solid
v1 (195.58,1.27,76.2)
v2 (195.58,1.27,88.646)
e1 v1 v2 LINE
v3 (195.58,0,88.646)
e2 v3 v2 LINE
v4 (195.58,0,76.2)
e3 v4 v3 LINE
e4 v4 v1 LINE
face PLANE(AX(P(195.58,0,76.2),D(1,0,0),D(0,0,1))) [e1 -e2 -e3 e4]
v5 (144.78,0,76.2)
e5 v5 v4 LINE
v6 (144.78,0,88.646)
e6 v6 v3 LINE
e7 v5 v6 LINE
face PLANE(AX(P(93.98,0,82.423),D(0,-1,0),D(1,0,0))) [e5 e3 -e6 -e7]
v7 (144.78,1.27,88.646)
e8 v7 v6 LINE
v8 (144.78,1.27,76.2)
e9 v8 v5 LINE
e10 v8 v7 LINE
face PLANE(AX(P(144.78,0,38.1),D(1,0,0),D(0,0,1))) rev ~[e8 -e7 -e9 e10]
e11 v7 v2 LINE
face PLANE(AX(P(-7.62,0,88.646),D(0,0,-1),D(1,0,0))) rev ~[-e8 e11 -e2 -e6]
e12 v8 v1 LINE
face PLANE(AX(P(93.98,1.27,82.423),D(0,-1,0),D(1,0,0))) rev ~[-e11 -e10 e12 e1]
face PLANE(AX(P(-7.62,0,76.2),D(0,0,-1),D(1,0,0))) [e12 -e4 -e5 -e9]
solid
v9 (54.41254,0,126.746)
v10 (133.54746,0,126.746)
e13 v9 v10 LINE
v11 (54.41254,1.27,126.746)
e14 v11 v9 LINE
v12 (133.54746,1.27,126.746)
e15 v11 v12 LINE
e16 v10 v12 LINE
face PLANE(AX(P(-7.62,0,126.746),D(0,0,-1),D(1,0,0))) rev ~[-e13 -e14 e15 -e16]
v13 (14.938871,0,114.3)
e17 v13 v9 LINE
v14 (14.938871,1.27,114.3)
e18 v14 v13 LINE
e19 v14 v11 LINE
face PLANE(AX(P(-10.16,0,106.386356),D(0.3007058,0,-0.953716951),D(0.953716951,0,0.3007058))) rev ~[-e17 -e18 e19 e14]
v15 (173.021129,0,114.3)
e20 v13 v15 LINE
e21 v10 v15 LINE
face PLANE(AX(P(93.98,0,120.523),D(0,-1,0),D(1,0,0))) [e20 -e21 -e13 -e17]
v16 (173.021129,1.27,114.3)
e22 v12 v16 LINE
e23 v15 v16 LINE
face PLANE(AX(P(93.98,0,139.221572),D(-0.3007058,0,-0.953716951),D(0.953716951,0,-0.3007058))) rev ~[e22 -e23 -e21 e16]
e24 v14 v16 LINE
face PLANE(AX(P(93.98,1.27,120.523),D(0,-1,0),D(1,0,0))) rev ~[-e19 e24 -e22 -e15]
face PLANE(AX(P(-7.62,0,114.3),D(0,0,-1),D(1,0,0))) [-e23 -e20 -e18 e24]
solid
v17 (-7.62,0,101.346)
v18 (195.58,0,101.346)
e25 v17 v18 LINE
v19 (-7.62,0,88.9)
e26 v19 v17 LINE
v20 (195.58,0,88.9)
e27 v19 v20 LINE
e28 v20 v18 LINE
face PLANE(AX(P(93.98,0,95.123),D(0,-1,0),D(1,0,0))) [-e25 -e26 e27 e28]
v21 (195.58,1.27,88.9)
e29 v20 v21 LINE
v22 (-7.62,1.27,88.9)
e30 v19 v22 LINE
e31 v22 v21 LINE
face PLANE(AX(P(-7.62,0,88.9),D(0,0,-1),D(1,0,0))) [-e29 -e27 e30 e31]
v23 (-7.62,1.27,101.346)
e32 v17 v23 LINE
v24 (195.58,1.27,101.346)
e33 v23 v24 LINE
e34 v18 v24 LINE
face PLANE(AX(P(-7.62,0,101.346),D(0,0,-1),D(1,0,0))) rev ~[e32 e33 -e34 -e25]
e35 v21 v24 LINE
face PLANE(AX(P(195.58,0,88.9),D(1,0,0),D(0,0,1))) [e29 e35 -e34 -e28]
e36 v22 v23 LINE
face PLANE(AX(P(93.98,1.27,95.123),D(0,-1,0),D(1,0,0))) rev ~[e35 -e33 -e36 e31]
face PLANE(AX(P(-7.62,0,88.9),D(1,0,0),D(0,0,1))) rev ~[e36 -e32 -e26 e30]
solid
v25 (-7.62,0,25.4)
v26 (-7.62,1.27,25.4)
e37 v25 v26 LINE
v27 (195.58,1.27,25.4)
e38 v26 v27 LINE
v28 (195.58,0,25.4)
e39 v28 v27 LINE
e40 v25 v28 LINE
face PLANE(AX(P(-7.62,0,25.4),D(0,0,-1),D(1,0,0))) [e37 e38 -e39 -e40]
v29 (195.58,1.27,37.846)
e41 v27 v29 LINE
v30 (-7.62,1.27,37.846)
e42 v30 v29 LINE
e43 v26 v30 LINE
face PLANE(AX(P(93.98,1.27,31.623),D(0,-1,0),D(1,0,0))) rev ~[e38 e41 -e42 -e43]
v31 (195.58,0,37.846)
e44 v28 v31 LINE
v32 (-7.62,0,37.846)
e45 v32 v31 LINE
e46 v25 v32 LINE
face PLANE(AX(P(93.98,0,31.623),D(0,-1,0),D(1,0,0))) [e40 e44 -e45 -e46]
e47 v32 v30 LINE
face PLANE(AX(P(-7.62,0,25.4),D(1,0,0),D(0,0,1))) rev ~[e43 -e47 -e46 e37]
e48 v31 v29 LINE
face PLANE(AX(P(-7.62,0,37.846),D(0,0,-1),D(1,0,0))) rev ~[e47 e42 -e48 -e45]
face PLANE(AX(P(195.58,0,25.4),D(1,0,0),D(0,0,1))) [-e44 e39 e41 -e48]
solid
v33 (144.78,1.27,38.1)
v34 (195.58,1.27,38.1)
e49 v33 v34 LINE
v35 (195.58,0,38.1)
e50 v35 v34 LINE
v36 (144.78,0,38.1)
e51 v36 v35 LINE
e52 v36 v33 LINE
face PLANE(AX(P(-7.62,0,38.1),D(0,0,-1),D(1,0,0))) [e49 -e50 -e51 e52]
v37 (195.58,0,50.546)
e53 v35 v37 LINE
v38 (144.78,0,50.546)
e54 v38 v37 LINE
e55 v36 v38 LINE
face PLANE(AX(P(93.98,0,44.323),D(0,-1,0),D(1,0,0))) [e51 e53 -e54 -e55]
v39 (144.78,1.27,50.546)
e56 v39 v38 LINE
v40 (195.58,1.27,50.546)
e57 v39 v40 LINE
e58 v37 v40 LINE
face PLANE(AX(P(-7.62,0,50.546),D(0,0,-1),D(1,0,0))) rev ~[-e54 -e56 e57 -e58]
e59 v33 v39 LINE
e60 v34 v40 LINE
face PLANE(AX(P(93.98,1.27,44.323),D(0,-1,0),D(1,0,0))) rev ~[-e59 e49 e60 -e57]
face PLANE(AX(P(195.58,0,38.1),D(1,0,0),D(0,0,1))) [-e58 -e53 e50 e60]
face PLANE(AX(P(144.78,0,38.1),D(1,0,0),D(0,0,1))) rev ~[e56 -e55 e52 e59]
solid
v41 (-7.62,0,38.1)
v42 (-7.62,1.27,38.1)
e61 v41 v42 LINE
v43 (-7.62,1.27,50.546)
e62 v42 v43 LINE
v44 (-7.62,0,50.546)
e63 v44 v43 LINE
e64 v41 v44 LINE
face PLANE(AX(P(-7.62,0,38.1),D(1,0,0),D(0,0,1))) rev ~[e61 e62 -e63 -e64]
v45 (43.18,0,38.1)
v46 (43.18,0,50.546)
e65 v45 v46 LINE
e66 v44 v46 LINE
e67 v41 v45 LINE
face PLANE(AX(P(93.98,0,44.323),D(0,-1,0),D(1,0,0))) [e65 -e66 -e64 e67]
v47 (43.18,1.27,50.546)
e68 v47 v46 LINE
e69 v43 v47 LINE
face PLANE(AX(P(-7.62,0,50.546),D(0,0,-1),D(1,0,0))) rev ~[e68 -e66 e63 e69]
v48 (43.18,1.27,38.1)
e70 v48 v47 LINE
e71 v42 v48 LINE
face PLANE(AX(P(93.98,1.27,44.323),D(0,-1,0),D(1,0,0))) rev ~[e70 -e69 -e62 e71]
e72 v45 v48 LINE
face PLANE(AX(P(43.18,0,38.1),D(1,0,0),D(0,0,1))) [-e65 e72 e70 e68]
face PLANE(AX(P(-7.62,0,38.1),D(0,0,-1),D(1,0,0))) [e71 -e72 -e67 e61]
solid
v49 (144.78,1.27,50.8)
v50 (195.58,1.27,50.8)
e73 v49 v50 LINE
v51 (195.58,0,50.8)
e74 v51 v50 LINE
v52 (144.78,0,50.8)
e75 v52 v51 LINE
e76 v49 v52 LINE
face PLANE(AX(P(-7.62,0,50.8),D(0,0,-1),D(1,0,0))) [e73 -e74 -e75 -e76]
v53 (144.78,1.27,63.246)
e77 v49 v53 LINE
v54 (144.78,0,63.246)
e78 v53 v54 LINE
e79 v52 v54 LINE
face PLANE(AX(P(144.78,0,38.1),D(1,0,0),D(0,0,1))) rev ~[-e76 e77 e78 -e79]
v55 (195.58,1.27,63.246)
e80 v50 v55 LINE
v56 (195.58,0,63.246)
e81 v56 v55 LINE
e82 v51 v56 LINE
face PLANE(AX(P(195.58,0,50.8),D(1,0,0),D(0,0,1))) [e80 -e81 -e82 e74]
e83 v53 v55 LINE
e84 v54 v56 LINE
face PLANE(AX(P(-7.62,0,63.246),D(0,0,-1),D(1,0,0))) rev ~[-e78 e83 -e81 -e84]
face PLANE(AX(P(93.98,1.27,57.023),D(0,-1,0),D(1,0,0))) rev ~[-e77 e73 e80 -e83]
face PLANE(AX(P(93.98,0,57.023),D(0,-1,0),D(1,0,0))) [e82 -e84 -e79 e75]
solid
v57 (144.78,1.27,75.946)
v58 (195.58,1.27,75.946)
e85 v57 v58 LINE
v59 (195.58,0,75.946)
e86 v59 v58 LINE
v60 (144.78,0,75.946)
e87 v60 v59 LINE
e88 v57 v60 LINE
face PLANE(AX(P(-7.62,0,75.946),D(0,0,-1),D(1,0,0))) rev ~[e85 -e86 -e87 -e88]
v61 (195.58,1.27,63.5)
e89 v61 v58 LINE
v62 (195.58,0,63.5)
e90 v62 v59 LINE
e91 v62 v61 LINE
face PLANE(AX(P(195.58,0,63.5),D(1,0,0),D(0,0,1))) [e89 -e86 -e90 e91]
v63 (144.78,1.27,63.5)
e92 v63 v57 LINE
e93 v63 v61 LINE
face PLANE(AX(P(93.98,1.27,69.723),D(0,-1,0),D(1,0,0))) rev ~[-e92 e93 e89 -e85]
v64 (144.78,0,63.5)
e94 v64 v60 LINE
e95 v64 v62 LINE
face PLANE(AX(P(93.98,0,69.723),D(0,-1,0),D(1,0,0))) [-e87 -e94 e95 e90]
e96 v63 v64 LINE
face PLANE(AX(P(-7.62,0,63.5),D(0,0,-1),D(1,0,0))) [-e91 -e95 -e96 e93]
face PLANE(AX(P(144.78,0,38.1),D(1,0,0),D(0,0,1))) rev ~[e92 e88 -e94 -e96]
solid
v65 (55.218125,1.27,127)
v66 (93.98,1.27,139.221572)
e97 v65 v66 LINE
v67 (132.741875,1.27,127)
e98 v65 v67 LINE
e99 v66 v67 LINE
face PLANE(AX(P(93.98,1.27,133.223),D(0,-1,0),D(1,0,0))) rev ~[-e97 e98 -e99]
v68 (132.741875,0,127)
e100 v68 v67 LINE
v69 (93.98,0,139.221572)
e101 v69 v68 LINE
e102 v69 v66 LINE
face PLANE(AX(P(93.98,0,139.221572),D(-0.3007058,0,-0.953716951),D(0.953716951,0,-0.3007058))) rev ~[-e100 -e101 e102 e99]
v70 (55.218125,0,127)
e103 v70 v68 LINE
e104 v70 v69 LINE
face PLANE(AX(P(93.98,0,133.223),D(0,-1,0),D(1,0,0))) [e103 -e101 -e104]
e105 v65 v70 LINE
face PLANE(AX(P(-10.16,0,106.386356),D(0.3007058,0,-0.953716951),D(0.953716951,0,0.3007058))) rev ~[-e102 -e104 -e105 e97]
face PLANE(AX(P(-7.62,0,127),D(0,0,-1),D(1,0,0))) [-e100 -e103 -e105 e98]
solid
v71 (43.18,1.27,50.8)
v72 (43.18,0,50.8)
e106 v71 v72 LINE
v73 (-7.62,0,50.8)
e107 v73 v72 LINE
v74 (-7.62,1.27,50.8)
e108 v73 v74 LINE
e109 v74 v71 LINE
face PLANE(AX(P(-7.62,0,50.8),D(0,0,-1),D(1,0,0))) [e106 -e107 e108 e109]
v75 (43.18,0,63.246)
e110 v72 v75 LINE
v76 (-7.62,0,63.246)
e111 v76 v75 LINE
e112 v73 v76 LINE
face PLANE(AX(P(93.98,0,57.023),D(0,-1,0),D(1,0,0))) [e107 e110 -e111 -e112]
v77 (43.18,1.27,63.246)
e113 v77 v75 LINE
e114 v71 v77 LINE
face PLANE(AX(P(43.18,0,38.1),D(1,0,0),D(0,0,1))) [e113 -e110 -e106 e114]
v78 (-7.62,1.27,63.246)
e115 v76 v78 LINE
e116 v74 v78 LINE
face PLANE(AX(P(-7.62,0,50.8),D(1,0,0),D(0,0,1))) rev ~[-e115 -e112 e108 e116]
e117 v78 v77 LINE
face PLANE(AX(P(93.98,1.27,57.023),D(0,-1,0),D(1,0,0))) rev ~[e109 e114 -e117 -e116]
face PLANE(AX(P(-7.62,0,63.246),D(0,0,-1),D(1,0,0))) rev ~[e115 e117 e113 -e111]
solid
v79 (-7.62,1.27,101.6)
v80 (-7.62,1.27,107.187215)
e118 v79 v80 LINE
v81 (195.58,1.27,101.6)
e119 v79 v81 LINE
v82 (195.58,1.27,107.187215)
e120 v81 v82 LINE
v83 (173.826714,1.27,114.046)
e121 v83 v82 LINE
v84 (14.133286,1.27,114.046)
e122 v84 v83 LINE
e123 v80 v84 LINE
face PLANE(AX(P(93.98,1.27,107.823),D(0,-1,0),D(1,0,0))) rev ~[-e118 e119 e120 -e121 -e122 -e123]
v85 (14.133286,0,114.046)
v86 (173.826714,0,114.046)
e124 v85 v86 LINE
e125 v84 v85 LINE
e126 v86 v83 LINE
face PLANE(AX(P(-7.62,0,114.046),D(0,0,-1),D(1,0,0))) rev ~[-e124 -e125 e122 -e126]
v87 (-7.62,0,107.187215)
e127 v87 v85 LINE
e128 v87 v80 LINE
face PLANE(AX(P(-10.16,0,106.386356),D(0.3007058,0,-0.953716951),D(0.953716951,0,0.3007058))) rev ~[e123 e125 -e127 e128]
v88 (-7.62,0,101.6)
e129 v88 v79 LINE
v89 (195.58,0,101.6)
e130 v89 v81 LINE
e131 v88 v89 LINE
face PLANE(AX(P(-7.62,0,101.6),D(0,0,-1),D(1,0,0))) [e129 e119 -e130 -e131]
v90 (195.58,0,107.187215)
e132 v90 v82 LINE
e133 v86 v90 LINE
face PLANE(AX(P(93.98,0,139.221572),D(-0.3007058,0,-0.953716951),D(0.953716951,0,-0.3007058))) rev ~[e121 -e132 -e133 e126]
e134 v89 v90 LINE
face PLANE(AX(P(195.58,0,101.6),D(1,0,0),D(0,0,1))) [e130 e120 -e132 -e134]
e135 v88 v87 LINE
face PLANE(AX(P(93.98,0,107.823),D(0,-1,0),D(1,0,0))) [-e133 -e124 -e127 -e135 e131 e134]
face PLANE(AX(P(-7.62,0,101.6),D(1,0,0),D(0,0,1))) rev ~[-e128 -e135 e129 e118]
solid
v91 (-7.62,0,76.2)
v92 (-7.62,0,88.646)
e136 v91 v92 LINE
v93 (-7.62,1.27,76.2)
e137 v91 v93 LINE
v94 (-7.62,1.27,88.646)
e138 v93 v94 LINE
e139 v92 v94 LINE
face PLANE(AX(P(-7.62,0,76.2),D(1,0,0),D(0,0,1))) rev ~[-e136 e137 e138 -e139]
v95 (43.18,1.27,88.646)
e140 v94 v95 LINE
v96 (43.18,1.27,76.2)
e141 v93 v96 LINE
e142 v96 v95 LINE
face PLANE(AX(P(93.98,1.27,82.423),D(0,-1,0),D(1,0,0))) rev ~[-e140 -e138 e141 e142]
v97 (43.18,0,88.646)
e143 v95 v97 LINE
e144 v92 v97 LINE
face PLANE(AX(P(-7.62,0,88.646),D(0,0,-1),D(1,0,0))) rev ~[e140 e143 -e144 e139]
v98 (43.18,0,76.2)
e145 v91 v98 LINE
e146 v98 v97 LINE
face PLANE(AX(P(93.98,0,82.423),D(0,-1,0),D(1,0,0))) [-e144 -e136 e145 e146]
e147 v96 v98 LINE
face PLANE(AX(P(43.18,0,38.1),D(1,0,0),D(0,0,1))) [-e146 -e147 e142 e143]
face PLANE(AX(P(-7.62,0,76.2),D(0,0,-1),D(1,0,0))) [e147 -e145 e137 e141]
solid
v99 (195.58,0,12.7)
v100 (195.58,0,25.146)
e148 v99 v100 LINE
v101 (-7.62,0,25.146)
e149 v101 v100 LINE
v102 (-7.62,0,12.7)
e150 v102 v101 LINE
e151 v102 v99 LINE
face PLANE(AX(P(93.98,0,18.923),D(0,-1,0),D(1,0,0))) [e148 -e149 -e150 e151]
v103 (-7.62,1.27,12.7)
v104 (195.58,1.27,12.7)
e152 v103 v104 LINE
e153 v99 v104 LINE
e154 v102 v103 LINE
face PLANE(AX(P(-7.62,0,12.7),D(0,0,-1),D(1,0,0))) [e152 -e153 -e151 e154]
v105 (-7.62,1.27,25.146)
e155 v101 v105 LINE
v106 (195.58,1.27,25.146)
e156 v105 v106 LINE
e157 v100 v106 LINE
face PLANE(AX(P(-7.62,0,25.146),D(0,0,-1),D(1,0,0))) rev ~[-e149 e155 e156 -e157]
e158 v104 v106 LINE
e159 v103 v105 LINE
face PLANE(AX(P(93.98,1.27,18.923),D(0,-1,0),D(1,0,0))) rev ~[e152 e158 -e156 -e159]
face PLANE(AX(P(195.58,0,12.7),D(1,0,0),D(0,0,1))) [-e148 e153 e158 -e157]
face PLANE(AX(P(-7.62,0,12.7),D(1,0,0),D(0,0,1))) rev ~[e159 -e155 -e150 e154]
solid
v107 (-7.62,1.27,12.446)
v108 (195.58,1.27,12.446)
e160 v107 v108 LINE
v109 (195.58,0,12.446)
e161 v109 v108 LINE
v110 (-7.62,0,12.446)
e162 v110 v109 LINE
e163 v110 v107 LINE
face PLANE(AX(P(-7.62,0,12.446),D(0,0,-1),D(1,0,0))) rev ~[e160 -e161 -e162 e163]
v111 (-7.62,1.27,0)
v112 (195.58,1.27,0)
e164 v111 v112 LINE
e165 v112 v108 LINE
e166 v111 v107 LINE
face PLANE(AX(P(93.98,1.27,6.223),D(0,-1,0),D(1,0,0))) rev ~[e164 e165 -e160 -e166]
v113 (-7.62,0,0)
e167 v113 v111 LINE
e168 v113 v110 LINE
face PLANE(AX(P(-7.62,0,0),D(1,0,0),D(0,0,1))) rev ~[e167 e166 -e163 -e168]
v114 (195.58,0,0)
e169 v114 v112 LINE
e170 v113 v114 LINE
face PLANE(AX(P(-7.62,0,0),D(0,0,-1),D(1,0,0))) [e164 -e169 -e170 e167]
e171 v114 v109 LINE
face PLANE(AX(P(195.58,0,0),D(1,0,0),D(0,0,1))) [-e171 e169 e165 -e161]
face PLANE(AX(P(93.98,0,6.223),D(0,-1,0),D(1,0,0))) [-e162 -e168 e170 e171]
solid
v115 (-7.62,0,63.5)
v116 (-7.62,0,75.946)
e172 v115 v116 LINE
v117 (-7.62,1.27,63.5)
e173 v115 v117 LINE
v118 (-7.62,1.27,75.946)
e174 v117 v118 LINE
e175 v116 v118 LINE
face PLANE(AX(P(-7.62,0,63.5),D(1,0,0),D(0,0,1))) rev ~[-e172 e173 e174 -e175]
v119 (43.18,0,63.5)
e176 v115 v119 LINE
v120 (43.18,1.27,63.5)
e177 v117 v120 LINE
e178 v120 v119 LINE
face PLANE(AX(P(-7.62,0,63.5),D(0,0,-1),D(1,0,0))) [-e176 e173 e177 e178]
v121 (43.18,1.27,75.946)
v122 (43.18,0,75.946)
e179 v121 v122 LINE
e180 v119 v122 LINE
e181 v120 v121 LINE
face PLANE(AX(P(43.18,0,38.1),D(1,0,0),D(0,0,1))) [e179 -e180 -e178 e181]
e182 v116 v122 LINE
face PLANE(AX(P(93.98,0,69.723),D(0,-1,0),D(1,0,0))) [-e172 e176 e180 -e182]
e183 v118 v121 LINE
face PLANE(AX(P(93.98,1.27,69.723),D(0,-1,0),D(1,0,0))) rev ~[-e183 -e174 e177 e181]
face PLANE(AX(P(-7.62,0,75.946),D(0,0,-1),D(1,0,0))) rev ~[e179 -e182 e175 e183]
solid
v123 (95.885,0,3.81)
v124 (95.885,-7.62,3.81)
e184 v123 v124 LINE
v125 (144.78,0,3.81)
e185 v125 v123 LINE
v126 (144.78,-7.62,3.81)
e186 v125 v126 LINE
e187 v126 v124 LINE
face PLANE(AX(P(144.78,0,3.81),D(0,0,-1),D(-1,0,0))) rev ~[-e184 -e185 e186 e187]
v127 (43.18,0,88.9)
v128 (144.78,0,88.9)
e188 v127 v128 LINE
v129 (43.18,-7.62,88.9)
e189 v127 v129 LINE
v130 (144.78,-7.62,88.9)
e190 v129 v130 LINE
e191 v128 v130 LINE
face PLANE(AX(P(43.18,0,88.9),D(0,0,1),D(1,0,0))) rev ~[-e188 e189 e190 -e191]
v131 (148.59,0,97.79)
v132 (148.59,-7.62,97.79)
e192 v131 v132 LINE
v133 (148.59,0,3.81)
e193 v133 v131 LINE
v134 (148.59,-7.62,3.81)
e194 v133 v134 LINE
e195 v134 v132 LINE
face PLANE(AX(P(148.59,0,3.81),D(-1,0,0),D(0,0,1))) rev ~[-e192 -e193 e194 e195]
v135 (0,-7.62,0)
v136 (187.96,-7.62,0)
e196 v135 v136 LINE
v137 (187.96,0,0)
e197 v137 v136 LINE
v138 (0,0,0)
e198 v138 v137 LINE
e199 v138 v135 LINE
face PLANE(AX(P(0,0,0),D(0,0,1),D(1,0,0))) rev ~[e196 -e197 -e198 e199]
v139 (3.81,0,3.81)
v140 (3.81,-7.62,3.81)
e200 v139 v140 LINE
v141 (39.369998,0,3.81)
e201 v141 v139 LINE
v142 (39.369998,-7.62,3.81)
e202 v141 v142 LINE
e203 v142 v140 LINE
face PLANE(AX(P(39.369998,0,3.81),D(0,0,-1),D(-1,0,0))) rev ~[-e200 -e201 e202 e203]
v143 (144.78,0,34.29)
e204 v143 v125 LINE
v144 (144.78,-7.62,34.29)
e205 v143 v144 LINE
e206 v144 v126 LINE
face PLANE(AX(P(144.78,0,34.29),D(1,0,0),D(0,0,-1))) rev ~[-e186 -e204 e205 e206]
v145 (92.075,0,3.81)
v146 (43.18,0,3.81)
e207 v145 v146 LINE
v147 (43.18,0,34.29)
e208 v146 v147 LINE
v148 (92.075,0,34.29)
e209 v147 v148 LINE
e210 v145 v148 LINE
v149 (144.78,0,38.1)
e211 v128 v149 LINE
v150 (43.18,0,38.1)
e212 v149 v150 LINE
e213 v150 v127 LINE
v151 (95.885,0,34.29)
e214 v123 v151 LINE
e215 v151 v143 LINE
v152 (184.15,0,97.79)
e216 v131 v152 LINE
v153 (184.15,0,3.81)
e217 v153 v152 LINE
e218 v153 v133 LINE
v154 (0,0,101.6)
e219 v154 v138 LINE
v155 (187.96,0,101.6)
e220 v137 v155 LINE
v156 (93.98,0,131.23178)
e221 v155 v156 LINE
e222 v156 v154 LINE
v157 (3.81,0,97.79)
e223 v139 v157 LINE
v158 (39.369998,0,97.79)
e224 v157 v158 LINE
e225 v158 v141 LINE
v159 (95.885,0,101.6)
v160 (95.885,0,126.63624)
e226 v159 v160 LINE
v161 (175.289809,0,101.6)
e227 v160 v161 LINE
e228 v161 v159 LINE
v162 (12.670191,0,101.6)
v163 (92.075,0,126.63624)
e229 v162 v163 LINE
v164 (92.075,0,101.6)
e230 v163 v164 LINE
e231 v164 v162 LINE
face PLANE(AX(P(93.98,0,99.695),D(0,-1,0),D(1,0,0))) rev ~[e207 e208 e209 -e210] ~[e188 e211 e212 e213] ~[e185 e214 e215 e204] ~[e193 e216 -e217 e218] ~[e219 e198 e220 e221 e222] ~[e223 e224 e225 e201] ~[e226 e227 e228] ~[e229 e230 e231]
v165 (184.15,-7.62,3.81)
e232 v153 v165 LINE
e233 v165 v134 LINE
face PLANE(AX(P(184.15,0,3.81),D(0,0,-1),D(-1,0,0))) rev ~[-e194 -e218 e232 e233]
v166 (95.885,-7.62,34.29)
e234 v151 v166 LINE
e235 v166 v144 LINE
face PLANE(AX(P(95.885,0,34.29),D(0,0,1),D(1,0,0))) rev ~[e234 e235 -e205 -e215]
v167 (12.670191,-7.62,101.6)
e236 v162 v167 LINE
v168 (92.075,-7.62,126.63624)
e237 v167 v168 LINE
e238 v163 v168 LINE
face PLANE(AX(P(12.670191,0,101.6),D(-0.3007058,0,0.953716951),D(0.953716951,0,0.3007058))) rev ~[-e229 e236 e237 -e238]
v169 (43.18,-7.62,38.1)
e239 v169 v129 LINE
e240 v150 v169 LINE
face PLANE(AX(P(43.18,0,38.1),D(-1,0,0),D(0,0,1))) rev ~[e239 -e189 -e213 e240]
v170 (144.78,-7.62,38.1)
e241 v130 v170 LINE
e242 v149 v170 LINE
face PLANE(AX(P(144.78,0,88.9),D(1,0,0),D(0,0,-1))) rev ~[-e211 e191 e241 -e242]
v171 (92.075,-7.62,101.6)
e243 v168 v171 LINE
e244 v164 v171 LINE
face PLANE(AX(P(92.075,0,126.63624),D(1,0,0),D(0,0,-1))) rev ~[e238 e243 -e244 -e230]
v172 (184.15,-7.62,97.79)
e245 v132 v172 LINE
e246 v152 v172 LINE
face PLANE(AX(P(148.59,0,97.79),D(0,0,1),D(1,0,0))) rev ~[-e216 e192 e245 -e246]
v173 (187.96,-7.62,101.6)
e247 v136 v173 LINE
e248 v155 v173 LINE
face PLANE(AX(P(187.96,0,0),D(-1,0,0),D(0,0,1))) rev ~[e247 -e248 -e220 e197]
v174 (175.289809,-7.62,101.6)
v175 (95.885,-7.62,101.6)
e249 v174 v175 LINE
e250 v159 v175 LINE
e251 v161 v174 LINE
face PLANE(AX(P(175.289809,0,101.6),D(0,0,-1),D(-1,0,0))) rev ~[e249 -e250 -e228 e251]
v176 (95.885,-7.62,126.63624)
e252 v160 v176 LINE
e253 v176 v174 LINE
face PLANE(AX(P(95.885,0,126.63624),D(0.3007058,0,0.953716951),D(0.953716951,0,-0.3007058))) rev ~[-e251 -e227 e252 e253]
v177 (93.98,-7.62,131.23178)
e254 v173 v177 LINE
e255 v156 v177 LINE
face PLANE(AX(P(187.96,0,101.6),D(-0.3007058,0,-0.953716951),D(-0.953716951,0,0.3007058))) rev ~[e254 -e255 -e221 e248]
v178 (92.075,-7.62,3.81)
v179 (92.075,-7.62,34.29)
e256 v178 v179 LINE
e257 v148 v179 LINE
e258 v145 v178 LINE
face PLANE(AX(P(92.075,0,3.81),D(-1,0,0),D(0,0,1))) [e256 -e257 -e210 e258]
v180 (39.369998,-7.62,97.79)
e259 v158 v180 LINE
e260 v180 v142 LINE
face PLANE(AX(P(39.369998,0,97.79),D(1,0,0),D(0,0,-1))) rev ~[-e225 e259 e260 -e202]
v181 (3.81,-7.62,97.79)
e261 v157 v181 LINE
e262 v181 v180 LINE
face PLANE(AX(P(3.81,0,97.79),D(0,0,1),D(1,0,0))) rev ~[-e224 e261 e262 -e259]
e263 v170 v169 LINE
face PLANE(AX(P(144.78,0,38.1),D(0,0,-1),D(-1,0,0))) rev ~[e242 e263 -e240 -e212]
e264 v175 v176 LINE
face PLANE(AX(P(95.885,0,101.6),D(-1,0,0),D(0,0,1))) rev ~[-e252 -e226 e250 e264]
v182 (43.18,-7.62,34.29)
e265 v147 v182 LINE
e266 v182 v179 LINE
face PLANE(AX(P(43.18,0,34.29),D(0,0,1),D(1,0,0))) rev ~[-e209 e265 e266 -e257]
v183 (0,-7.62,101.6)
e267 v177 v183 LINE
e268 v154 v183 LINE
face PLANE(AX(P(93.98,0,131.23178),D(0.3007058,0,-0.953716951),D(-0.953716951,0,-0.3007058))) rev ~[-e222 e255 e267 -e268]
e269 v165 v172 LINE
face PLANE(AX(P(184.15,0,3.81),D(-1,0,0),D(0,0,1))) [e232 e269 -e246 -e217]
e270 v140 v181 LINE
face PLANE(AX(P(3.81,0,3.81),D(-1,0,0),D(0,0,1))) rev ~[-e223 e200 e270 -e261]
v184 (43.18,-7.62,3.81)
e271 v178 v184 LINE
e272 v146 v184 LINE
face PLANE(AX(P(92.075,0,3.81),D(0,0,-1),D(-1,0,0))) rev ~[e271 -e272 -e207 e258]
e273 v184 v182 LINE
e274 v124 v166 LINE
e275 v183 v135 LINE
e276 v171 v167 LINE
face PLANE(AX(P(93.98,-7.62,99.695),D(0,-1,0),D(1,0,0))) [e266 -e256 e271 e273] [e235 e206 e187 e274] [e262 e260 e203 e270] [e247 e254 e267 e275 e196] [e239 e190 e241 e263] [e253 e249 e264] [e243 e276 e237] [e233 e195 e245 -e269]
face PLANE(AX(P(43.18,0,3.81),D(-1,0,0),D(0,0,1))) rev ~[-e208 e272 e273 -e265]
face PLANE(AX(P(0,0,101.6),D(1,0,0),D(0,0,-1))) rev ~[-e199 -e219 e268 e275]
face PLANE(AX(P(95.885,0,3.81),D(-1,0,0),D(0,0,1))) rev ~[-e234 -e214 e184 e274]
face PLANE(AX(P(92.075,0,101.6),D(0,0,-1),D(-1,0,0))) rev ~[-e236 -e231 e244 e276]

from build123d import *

# Parameters (mm, degrees)
F0_W     = 3.81
F0_H     = 93.98
F0_W_2   = 101.6
F0_H_2   = 3.81
F0_H_3   = 30.48
F0_H_4   = 5.08
F1_DEPTH = 7.62
F2_W     = 203.2
F2_H     = 12.446
F3_DEPTH = 1.27
F0_H_5   = 50.8
F4_DEPTH = 25.4
F6_DEPTH = 2.54


# Not quite as in the source:
# - a feature names something its author has since deleted; it is built from what else it names


with BuildPart() as f1:
    # F0 (on Front) → F1 (new body)
    with BuildSketch(Plane.XZ):
        Polygon((0, 101.6), (0, 97.79), (3.81, 97.79), (39.3699984628, 97.79), (43.18, 97.79), (144.78, 97.79), (148.59, 97.79), (184.15, 97.79), (187.96, 97.79), (187.96, 101.6), (175.2898087158, 101.6), (95.885, 101.6), (92.075, 101.6), (12.6701912842, 101.6), align=None)
        with Locations((1.905, 50.8)):
            Rectangle(F0_W, F0_H)
        Polygon((39.3699984628, 97.79), (39.3699984628, 3.81), (43.18, 3.81), (43.18, 34.29), (43.18, 38.1), (43.18, 88.9), (43.18, 92.71), (43.18, 97.79), align=None)
        with Locations((93.98, 90.805)):
            Rectangle(F0_W_2, F0_H_2)
        Polygon((144.78, 3.81), (148.59, 3.81), (148.59, 97.79), (144.78, 97.79), (144.78, 92.71), (144.78, 88.9), (144.78, 38.1), (144.78, 34.29), align=None)
        with Locations((186.055, 50.8)):
            Rectangle(F0_W, F0_H)
        Polygon((43.18, 38.1), (43.18, 34.29), (92.075, 34.29), (95.885, 34.29), (144.78, 34.29), (144.78, 38.1), align=None)
        with Locations((93.98, 19.05)):
            Rectangle(F0_W, F0_H_3)
        Polygon((0, 3.81), (0, 0), (187.96, 0), (187.96, 3.81), (184.15, 3.81), (148.59, 3.81), (144.78, 3.81), (95.885, 3.81), (92.075, 3.81), (43.18, 3.81), (39.3699984628, 3.81), (3.81, 3.81), align=None)
        Polygon((93.98, 131.2317801788), (0, 101.6), (12.6701912842, 101.6), (92.075, 126.6362400192), (93.98, 127.2368842121), (95.885, 126.6362400192), (175.2898087158, 101.6), (187.96, 101.6), align=None)
        Polygon((92.075, 126.6362400192), (92.075, 101.6), (95.885, 101.6), (95.885, 126.6362400192), (93.98, 127.2368842121), align=None)
        with Locations((93.98, 95.25)):
            Rectangle(F0_W_2, F0_H_4)
    extrude(amount=F1_DEPTH)


with BuildPart() as f3:
    # F2 (on Front) → F3 (new body)
    with BuildSketch(Plane.XZ):
        with Locations((93.98, 6.223)):
            Rectangle(F2_W, F2_H)
    extrude(amount=-F3_DEPTH)


with BuildPart() as f3b:
    # F2 (on Front) → F3, piece 2 (new body)
    with BuildSketch(Plane.XZ):
        with Locations((93.98, 18.923)):
            Rectangle(F2_W, F2_H)
    extrude(amount=-F3_DEPTH)


with BuildPart() as f3c:
    # F2 (on Front) → F3, piece 3 (new body)
    with BuildSketch(Plane.XZ):
        with Locations((93.98, 31.623)):
            Rectangle(F2_W, F2_H)
    extrude(amount=-F3_DEPTH)


with BuildPart() as f3d:
    # F2 (on Front) → F3, piece 4 (new body)
    with BuildSketch(Plane.XZ):
        with Locations((93.98, 44.323)):
            Rectangle(F2_W, F2_H)
    extrude(amount=-F3_DEPTH)


with BuildPart() as f3e:
    # F2 (on Front) → F3, piece 5 (new body)
    with BuildSketch(Plane.XZ):
        with Locations((93.98, 57.023)):
            Rectangle(F2_W, F2_H)
    extrude(amount=-F3_DEPTH)


with BuildPart() as f3f:
    # F2 (on Front) → F3, piece 6 (new body)
    with BuildSketch(Plane.XZ):
        with Locations((93.98, 69.723)):
            Rectangle(F2_W, F2_H)
    extrude(amount=-F3_DEPTH)


with BuildPart() as f3g:
    # F2 (on Front) → F3, piece 7 (new body)
    with BuildSketch(Plane.XZ):
        with Locations((93.98, 82.423)):
            Rectangle(F2_W, F2_H)
    extrude(amount=-F3_DEPTH)


with BuildPart() as f3h:
    # F2 (on Front) → F3, piece 8 (new body)
    with BuildSketch(Plane.XZ):
        with Locations((93.98, 95.123)):
            Rectangle(F2_W, F2_H)
    extrude(amount=-F3_DEPTH)


with BuildPart() as f3i:
    # F2 (on Front) → F3, piece 9 (new body)
    with BuildSketch(Plane.XZ):
        with Locations((93.98, 107.823)):
            Rectangle(F2_W, F2_H)
    extrude(amount=-F3_DEPTH)


with BuildPart() as f3j:
    # F2 (on Front) → F3, piece 10 (new body)
    with BuildSketch(Plane.XZ):
        with Locations((93.98, 120.523)):
            Rectangle(F2_W, F2_H)
    extrude(amount=-F3_DEPTH)


with BuildPart() as f3k:
    # F2 (on Front) → F3, piece 11 (new body)
    with BuildSketch(Plane.XZ):
        with Locations((93.98, 133.223)):
            Rectangle(F2_W, F2_H)
    extrude(amount=-F3_DEPTH)


with BuildPart() as f4_tool:
    # F0 (on Front) → F4 (new body)
    with BuildSketch(Plane.XZ):
        with Locations((93.98, 63.5)):
            Rectangle(F0_W_2, F0_H_5)
    extrude(amount=-F4_DEPTH)


with BuildPart() as f3d_1:
    add(f3d.part)

    # F4: cut by f4_tool
    add(f4_tool.part, mode=Mode.SUBTRACT)


with BuildPart() as f3e_1:
    add(f3e.part)

    # F4: cut by f4_tool
    add(f4_tool.part, mode=Mode.SUBTRACT)


with BuildPart() as f3f_1:
    add(f3f.part)

    # F4: cut by f4_tool
    add(f4_tool.part, mode=Mode.SUBTRACT)


with BuildPart() as f3g_1:
    add(f3g.part)

    # F4: cut by f4_tool
    add(f4_tool.part, mode=Mode.SUBTRACT)


with BuildPart() as f6_tool:
    # F5 (on Front) → F6 (new body)
    with BuildSketch(Plane.XZ):
        Polygon((-10.16, 141.605), (-10.16, 106.3863562386), (93.98, 139.2215721124), (198.12, 106.3863562386), (198.12, 141.605), align=None)
    extrude(amount=-F6_DEPTH)


with BuildPart() as f3i_1:
    add(f3i.part)

    # F6: cut by f6_tool
    add(f6_tool.part, mode=Mode.SUBTRACT)


with BuildPart() as f3j_1:
    add(f3j.part)

    # F6: cut by f6_tool
    add(f6_tool.part, mode=Mode.SUBTRACT)


with BuildPart() as f3k_1:
    add(f3k.part)

    # F6: cut by f6_tool
    add(f6_tool.part, mode=Mode.SUBTRACT)


solid = Compound([f1.part, f3.part, f3b.part, f3c.part, f3h.part, f3d_1.part, f3e_1.part, f3f_1.part, f3g_1.part, f3i_1.part, f3j_1.part, f3k_1.part])
